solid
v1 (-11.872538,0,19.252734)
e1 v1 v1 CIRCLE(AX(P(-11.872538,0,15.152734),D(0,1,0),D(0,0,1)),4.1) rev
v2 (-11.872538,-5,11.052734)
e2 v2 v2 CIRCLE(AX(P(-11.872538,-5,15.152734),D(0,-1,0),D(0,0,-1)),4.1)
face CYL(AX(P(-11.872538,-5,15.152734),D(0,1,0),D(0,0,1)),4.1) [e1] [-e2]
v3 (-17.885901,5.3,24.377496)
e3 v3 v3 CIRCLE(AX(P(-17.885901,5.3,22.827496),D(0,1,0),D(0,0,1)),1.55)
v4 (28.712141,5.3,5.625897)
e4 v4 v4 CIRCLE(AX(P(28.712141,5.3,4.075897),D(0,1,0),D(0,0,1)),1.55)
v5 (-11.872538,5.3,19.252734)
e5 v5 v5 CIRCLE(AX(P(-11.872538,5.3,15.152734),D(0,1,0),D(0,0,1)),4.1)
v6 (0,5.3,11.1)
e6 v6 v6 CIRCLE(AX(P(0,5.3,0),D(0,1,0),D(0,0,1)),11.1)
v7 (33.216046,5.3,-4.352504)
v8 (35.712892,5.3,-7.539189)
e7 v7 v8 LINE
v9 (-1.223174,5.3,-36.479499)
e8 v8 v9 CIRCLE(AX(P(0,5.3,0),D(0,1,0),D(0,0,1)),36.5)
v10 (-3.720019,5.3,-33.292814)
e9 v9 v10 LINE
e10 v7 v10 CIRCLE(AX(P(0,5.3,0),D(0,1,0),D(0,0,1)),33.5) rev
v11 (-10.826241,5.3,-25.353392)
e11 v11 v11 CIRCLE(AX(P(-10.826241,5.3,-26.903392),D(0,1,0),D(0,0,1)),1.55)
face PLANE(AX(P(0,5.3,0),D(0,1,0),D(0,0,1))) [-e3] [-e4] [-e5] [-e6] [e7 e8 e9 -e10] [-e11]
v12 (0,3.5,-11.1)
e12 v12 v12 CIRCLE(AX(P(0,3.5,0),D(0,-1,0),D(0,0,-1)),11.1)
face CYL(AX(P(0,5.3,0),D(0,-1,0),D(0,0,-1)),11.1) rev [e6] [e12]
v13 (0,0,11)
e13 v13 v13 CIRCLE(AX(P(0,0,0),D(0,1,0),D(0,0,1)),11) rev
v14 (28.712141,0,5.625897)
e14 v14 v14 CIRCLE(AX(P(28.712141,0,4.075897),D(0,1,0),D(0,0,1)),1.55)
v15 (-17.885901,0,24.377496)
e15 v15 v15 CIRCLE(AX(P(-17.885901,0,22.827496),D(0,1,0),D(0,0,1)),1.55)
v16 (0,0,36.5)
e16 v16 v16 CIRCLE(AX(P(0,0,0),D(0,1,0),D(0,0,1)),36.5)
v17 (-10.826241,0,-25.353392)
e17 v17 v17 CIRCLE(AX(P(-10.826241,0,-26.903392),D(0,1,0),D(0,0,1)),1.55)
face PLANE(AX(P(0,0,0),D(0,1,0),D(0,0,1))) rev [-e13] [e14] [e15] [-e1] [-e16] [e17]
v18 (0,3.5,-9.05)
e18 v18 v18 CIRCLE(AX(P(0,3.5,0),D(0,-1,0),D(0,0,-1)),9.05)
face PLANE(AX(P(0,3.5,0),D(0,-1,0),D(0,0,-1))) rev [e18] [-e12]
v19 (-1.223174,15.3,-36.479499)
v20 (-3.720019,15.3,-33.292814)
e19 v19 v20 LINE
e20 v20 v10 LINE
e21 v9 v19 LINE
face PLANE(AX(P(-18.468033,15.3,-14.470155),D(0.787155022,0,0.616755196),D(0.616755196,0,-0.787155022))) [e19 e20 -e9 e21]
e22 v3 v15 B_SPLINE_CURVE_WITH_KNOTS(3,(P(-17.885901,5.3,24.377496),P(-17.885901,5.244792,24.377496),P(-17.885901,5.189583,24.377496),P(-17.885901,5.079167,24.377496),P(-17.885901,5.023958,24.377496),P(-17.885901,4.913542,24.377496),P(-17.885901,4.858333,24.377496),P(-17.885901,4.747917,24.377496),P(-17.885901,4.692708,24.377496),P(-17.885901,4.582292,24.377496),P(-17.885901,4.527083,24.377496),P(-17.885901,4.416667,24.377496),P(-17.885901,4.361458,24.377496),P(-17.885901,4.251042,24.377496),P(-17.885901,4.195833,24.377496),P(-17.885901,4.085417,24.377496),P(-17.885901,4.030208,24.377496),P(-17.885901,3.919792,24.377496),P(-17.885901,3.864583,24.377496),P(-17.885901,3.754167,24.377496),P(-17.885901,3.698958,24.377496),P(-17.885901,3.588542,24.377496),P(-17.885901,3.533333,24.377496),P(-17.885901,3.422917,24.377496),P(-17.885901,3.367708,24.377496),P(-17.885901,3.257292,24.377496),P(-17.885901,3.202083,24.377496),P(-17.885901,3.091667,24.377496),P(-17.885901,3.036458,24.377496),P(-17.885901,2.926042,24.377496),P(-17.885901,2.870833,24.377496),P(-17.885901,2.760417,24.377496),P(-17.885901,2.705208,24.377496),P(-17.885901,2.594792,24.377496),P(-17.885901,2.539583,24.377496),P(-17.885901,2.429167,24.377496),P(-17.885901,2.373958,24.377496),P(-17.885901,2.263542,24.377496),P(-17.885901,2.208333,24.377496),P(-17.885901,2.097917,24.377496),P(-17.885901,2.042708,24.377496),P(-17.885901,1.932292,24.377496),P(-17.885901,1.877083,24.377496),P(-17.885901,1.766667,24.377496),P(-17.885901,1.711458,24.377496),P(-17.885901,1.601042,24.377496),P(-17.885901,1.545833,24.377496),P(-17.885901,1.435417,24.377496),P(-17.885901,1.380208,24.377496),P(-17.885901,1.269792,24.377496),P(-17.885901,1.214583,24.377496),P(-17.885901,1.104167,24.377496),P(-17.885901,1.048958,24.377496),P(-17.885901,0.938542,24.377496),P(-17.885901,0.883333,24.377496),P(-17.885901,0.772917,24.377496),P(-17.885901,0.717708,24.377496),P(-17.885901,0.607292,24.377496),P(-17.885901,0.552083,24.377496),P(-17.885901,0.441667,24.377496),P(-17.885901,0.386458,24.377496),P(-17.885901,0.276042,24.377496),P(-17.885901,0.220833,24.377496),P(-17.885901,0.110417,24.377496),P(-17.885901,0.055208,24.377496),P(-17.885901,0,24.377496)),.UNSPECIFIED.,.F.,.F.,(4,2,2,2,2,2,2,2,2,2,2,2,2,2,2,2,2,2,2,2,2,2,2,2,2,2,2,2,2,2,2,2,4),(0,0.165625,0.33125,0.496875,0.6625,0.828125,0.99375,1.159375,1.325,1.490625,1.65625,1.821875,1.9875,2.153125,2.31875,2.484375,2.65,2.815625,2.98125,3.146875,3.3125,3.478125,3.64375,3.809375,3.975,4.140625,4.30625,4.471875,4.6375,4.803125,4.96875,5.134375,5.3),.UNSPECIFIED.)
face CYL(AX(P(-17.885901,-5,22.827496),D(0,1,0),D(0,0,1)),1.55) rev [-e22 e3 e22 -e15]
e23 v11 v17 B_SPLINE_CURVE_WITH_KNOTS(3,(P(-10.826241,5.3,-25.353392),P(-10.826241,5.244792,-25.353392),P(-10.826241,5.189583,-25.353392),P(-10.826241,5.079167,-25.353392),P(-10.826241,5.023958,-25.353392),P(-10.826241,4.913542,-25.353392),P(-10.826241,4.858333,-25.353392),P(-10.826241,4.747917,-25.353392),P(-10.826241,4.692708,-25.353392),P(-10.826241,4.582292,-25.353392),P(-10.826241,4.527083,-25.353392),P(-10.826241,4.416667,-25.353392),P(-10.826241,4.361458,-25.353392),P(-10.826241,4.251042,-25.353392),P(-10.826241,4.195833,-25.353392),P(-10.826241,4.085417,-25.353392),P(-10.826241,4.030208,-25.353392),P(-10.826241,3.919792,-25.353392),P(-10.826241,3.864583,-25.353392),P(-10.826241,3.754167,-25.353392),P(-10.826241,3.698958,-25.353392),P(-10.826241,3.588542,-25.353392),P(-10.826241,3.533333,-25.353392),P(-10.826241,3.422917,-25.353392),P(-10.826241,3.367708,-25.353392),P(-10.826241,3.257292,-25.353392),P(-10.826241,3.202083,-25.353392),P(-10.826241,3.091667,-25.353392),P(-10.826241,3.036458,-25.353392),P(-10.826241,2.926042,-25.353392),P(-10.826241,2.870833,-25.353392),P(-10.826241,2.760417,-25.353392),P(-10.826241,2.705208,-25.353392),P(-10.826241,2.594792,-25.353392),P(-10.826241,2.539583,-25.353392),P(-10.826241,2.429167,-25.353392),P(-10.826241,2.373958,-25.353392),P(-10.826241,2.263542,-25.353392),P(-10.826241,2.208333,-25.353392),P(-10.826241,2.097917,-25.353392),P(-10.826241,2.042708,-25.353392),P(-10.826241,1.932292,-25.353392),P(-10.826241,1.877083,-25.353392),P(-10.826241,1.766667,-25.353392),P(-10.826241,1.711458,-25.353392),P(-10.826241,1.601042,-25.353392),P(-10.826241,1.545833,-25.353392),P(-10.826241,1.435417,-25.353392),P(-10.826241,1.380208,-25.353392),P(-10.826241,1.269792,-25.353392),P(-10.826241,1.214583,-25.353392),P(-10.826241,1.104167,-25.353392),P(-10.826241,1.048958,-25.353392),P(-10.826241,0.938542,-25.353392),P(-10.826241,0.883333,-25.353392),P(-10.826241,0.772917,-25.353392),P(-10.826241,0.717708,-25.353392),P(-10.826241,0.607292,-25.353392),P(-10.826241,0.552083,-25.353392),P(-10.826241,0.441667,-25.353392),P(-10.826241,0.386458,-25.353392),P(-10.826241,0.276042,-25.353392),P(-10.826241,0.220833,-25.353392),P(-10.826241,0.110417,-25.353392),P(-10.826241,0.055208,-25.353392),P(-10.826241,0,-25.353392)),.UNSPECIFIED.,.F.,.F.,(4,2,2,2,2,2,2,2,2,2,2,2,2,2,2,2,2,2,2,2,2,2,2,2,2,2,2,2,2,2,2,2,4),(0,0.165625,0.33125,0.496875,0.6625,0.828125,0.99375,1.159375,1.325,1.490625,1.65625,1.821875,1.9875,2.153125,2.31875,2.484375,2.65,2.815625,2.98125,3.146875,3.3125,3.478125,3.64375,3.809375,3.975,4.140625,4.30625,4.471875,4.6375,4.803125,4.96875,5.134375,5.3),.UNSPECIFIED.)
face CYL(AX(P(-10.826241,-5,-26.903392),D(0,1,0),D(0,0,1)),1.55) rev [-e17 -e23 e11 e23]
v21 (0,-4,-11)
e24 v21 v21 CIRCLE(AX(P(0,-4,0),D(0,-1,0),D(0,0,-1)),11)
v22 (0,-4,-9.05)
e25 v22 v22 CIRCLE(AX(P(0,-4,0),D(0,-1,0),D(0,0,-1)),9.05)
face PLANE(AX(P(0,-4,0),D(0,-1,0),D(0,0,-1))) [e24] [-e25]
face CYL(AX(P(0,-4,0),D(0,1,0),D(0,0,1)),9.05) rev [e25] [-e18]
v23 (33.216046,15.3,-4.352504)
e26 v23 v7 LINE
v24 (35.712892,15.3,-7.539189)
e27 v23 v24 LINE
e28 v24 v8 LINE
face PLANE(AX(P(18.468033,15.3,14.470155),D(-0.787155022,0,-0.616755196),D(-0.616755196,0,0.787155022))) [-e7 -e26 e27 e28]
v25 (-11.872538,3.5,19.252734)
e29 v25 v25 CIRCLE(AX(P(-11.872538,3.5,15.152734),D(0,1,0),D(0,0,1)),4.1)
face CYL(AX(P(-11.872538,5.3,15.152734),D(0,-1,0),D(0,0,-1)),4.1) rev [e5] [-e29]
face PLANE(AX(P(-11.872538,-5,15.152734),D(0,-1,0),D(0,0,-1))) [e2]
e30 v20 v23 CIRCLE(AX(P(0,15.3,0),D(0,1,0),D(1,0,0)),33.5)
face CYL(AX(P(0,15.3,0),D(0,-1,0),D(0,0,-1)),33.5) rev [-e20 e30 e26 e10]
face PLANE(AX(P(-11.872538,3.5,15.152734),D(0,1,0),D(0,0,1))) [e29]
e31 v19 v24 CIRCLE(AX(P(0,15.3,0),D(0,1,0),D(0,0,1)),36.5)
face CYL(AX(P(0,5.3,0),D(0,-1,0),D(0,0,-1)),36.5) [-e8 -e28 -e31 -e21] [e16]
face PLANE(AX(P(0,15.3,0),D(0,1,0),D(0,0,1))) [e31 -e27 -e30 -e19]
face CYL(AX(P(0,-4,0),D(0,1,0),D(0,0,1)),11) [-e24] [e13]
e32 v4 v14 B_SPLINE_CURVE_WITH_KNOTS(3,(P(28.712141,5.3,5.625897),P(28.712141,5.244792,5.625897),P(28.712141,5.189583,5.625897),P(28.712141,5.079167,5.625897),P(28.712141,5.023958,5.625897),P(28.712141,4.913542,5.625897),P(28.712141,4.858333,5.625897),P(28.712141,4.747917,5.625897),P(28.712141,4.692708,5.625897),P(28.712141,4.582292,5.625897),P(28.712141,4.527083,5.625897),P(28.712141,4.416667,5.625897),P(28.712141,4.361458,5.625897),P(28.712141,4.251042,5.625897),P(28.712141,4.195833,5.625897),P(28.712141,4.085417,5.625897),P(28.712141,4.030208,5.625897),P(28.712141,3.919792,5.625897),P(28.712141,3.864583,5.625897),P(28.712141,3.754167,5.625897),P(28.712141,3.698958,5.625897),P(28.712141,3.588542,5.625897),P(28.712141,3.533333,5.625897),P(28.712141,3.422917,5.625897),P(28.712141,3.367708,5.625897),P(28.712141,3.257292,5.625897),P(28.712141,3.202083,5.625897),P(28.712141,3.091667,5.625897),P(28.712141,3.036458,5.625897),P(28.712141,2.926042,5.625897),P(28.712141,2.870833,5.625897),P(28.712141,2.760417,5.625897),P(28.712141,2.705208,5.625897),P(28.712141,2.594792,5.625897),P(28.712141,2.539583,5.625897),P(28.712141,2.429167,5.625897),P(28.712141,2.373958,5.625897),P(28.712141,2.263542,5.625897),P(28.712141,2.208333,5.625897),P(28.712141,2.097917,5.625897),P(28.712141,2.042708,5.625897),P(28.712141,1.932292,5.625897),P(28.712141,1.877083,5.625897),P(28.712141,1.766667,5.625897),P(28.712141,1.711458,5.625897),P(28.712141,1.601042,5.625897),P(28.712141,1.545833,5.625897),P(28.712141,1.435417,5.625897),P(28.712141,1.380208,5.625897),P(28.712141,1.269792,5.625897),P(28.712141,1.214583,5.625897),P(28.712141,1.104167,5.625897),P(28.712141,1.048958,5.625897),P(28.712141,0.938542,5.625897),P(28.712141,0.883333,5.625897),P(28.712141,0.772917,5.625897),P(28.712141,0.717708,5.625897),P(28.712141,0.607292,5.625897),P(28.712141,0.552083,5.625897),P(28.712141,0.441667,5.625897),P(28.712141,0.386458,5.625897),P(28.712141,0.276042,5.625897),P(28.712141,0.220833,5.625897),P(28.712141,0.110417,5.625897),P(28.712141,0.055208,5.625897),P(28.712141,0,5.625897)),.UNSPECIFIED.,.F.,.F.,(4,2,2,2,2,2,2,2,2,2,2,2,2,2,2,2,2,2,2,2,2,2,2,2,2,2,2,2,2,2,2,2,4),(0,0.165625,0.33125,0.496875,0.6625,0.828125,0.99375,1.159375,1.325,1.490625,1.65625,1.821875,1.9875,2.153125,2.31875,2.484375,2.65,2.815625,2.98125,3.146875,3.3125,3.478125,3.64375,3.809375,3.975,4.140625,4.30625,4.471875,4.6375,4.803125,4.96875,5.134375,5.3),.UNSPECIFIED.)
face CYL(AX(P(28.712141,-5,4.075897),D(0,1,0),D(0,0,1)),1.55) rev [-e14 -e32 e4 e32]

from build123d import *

# Parameters (mm, degrees)
SKETCH_1_R          = 36.5
EXTRUDE_1_DEPTH     = 5.3
SKETCH_2_R          = 36.5
SKETCH_2_R_2        = 33.5
EXTRUDE_1_2_DEPTH   = 10
SKETCH_4_R          = 4.1
EXTRUDE_3_DEPTH     = 5
SKETCH_5_R          = 4.1
EXTRUDE_4_DEPTH     = 3.5
CUT_EXTRUDE_1_DEPTH = 10
SKETCH_8_R          = 12
EXTRUDE_7_DEPTH     = 3.5
SKETCH_9_R          = 11
SKETCH_9_R_2        = 9.05
EXTRUDE_8_DEPTH     = 4
CUT_EXTRUDE_START   = -10
SKETCH_10_R         = 9.05
CUT_EXTRUDE_2_DEPTH = 10
SKETCH_11_R         = 1.55
CUT_EXTRUDE_3_DEPTH = 53.636394253


with BuildPart() as part:
    # 草图1 → Extrude 1 (new body)
    with BuildSketch(Plane(origin=(0, 0, 0), x_dir=(1, 0, 0), z_dir=(0, 1, 0))):
        Circle(SKETCH_1_R)
        with BuildLine():
            ThreePointArc((-7.772537517, -15.152734173), (-15.558840193, -16.947496714), (-9.343841215, -11.925398583))
            ThreePointArc((-9.343841215, -11.925398583), (-8.186234841, -13.357971631), (-7.772537517, -15.152734173))
        make_face(mode=Mode.SUBTRACT)
        with BuildLine():
            ThreePointArc((11.1, 0), (4.858991271, -9.979990172), (-6.845982672, -8.737420744))
            ThreePointArc((-6.845982672, -8.737420744), (-4.858991271, 9.979990172), (11.1, 0))
        make_face(mode=Mode.SUBTRACT)
    extrude(amount=EXTRUDE_1_DEPTH)

    # 草图2 → Extrude 1 2 (add)
    with BuildSketch(Plane(origin=(0, 5.3, 0), x_dir=(1, 0, 0), z_dir=(0, 1, 0))):
        Circle(SKETCH_2_R)
        Circle(SKETCH_2_R_2, mode=Mode.SUBTRACT)
    extrude(amount=EXTRUDE_1_2_DEPTH)



with BuildPart() as body_2:
    # 草图4 → 凸台-拉伸3 (new body)
    with BuildSketch(Plane.XZ):
        with Locations((-11.872537517, 15.152734173)):
            Circle(SKETCH_4_R)
    extrude(amount=EXTRUDE_3_DEPTH)


with BuildPart() as part_1:
    add(part.part)

    add(body_2.part)  # 凸台-拉伸4 merges body 2
    # 草图5 → 凸台-拉伸4 (add)
    with BuildSketch(Plane(origin=(0, 0, 0), x_dir=(1, 0, 0), z_dir=(0, 1, 0))):
        with Locations((-11.872537517, -15.152734173)):
            Circle(SKETCH_5_R)
    extrude(amount=EXTRUDE_4_DEPTH)

    # 草图6 → 切除-拉伸1 (cut)
    with BuildSketch(Plane(origin=(0, 5.3, 0), x_dir=(1, 0, 0), z_dir=(0, 1, 0))):
        Polygon((0, 0), (30.542099638, 6.447606501), (33.216045924, 4.352504242), (44.964219504, 19.346514664), (8.028154367, 48.286824318), (-3.720019212, 33.292813895), (-1.046072926, 31.197711636), align=None)
    extrude(amount=CUT_EXTRUDE_1_DEPTH, mode=Mode.SUBTRACT)

    # 草图8 → 凸台-拉伸7 (add)
    with BuildSketch(Plane.XZ):
        Circle(SKETCH_8_R)
    extrude(amount=-EXTRUDE_7_DEPTH)

    # 草图9 → 凸台-拉伸8 (add)
    with BuildSketch(Plane.XZ):
        Circle(SKETCH_9_R)
        Circle(SKETCH_9_R_2, mode=Mode.SUBTRACT)
    extrude(amount=EXTRUDE_8_DEPTH)

    # 草图10 → 切除-拉伸2 (cut)
    with BuildSketch(Plane.XZ.offset(4).offset(CUT_EXTRUDE_START)):
        Circle(SKETCH_10_R)
    extrude(amount=CUT_EXTRUDE_2_DEPTH, mode=Mode.SUBTRACT)

    # 草图11 → 切除-拉伸3 (cut, through all)
    with BuildSketch(Plane(origin=(0, 5.3, 0), x_dir=(1, 0, 0), z_dir=(0, 1, 0))):
        with Locations((-17.885900675, -22.827495637)):
            Circle(SKETCH_11_R)
        with Locations((-10.826240789, 26.903392172)):
            Circle(SKETCH_11_R)
        with Locations((28.712141464, -4.075896535)):
            Circle(SKETCH_11_R)
    extrude(amount=-CUT_EXTRUDE_3_DEPTH, mode=Mode.SUBTRACT)


solid = part_1.part
